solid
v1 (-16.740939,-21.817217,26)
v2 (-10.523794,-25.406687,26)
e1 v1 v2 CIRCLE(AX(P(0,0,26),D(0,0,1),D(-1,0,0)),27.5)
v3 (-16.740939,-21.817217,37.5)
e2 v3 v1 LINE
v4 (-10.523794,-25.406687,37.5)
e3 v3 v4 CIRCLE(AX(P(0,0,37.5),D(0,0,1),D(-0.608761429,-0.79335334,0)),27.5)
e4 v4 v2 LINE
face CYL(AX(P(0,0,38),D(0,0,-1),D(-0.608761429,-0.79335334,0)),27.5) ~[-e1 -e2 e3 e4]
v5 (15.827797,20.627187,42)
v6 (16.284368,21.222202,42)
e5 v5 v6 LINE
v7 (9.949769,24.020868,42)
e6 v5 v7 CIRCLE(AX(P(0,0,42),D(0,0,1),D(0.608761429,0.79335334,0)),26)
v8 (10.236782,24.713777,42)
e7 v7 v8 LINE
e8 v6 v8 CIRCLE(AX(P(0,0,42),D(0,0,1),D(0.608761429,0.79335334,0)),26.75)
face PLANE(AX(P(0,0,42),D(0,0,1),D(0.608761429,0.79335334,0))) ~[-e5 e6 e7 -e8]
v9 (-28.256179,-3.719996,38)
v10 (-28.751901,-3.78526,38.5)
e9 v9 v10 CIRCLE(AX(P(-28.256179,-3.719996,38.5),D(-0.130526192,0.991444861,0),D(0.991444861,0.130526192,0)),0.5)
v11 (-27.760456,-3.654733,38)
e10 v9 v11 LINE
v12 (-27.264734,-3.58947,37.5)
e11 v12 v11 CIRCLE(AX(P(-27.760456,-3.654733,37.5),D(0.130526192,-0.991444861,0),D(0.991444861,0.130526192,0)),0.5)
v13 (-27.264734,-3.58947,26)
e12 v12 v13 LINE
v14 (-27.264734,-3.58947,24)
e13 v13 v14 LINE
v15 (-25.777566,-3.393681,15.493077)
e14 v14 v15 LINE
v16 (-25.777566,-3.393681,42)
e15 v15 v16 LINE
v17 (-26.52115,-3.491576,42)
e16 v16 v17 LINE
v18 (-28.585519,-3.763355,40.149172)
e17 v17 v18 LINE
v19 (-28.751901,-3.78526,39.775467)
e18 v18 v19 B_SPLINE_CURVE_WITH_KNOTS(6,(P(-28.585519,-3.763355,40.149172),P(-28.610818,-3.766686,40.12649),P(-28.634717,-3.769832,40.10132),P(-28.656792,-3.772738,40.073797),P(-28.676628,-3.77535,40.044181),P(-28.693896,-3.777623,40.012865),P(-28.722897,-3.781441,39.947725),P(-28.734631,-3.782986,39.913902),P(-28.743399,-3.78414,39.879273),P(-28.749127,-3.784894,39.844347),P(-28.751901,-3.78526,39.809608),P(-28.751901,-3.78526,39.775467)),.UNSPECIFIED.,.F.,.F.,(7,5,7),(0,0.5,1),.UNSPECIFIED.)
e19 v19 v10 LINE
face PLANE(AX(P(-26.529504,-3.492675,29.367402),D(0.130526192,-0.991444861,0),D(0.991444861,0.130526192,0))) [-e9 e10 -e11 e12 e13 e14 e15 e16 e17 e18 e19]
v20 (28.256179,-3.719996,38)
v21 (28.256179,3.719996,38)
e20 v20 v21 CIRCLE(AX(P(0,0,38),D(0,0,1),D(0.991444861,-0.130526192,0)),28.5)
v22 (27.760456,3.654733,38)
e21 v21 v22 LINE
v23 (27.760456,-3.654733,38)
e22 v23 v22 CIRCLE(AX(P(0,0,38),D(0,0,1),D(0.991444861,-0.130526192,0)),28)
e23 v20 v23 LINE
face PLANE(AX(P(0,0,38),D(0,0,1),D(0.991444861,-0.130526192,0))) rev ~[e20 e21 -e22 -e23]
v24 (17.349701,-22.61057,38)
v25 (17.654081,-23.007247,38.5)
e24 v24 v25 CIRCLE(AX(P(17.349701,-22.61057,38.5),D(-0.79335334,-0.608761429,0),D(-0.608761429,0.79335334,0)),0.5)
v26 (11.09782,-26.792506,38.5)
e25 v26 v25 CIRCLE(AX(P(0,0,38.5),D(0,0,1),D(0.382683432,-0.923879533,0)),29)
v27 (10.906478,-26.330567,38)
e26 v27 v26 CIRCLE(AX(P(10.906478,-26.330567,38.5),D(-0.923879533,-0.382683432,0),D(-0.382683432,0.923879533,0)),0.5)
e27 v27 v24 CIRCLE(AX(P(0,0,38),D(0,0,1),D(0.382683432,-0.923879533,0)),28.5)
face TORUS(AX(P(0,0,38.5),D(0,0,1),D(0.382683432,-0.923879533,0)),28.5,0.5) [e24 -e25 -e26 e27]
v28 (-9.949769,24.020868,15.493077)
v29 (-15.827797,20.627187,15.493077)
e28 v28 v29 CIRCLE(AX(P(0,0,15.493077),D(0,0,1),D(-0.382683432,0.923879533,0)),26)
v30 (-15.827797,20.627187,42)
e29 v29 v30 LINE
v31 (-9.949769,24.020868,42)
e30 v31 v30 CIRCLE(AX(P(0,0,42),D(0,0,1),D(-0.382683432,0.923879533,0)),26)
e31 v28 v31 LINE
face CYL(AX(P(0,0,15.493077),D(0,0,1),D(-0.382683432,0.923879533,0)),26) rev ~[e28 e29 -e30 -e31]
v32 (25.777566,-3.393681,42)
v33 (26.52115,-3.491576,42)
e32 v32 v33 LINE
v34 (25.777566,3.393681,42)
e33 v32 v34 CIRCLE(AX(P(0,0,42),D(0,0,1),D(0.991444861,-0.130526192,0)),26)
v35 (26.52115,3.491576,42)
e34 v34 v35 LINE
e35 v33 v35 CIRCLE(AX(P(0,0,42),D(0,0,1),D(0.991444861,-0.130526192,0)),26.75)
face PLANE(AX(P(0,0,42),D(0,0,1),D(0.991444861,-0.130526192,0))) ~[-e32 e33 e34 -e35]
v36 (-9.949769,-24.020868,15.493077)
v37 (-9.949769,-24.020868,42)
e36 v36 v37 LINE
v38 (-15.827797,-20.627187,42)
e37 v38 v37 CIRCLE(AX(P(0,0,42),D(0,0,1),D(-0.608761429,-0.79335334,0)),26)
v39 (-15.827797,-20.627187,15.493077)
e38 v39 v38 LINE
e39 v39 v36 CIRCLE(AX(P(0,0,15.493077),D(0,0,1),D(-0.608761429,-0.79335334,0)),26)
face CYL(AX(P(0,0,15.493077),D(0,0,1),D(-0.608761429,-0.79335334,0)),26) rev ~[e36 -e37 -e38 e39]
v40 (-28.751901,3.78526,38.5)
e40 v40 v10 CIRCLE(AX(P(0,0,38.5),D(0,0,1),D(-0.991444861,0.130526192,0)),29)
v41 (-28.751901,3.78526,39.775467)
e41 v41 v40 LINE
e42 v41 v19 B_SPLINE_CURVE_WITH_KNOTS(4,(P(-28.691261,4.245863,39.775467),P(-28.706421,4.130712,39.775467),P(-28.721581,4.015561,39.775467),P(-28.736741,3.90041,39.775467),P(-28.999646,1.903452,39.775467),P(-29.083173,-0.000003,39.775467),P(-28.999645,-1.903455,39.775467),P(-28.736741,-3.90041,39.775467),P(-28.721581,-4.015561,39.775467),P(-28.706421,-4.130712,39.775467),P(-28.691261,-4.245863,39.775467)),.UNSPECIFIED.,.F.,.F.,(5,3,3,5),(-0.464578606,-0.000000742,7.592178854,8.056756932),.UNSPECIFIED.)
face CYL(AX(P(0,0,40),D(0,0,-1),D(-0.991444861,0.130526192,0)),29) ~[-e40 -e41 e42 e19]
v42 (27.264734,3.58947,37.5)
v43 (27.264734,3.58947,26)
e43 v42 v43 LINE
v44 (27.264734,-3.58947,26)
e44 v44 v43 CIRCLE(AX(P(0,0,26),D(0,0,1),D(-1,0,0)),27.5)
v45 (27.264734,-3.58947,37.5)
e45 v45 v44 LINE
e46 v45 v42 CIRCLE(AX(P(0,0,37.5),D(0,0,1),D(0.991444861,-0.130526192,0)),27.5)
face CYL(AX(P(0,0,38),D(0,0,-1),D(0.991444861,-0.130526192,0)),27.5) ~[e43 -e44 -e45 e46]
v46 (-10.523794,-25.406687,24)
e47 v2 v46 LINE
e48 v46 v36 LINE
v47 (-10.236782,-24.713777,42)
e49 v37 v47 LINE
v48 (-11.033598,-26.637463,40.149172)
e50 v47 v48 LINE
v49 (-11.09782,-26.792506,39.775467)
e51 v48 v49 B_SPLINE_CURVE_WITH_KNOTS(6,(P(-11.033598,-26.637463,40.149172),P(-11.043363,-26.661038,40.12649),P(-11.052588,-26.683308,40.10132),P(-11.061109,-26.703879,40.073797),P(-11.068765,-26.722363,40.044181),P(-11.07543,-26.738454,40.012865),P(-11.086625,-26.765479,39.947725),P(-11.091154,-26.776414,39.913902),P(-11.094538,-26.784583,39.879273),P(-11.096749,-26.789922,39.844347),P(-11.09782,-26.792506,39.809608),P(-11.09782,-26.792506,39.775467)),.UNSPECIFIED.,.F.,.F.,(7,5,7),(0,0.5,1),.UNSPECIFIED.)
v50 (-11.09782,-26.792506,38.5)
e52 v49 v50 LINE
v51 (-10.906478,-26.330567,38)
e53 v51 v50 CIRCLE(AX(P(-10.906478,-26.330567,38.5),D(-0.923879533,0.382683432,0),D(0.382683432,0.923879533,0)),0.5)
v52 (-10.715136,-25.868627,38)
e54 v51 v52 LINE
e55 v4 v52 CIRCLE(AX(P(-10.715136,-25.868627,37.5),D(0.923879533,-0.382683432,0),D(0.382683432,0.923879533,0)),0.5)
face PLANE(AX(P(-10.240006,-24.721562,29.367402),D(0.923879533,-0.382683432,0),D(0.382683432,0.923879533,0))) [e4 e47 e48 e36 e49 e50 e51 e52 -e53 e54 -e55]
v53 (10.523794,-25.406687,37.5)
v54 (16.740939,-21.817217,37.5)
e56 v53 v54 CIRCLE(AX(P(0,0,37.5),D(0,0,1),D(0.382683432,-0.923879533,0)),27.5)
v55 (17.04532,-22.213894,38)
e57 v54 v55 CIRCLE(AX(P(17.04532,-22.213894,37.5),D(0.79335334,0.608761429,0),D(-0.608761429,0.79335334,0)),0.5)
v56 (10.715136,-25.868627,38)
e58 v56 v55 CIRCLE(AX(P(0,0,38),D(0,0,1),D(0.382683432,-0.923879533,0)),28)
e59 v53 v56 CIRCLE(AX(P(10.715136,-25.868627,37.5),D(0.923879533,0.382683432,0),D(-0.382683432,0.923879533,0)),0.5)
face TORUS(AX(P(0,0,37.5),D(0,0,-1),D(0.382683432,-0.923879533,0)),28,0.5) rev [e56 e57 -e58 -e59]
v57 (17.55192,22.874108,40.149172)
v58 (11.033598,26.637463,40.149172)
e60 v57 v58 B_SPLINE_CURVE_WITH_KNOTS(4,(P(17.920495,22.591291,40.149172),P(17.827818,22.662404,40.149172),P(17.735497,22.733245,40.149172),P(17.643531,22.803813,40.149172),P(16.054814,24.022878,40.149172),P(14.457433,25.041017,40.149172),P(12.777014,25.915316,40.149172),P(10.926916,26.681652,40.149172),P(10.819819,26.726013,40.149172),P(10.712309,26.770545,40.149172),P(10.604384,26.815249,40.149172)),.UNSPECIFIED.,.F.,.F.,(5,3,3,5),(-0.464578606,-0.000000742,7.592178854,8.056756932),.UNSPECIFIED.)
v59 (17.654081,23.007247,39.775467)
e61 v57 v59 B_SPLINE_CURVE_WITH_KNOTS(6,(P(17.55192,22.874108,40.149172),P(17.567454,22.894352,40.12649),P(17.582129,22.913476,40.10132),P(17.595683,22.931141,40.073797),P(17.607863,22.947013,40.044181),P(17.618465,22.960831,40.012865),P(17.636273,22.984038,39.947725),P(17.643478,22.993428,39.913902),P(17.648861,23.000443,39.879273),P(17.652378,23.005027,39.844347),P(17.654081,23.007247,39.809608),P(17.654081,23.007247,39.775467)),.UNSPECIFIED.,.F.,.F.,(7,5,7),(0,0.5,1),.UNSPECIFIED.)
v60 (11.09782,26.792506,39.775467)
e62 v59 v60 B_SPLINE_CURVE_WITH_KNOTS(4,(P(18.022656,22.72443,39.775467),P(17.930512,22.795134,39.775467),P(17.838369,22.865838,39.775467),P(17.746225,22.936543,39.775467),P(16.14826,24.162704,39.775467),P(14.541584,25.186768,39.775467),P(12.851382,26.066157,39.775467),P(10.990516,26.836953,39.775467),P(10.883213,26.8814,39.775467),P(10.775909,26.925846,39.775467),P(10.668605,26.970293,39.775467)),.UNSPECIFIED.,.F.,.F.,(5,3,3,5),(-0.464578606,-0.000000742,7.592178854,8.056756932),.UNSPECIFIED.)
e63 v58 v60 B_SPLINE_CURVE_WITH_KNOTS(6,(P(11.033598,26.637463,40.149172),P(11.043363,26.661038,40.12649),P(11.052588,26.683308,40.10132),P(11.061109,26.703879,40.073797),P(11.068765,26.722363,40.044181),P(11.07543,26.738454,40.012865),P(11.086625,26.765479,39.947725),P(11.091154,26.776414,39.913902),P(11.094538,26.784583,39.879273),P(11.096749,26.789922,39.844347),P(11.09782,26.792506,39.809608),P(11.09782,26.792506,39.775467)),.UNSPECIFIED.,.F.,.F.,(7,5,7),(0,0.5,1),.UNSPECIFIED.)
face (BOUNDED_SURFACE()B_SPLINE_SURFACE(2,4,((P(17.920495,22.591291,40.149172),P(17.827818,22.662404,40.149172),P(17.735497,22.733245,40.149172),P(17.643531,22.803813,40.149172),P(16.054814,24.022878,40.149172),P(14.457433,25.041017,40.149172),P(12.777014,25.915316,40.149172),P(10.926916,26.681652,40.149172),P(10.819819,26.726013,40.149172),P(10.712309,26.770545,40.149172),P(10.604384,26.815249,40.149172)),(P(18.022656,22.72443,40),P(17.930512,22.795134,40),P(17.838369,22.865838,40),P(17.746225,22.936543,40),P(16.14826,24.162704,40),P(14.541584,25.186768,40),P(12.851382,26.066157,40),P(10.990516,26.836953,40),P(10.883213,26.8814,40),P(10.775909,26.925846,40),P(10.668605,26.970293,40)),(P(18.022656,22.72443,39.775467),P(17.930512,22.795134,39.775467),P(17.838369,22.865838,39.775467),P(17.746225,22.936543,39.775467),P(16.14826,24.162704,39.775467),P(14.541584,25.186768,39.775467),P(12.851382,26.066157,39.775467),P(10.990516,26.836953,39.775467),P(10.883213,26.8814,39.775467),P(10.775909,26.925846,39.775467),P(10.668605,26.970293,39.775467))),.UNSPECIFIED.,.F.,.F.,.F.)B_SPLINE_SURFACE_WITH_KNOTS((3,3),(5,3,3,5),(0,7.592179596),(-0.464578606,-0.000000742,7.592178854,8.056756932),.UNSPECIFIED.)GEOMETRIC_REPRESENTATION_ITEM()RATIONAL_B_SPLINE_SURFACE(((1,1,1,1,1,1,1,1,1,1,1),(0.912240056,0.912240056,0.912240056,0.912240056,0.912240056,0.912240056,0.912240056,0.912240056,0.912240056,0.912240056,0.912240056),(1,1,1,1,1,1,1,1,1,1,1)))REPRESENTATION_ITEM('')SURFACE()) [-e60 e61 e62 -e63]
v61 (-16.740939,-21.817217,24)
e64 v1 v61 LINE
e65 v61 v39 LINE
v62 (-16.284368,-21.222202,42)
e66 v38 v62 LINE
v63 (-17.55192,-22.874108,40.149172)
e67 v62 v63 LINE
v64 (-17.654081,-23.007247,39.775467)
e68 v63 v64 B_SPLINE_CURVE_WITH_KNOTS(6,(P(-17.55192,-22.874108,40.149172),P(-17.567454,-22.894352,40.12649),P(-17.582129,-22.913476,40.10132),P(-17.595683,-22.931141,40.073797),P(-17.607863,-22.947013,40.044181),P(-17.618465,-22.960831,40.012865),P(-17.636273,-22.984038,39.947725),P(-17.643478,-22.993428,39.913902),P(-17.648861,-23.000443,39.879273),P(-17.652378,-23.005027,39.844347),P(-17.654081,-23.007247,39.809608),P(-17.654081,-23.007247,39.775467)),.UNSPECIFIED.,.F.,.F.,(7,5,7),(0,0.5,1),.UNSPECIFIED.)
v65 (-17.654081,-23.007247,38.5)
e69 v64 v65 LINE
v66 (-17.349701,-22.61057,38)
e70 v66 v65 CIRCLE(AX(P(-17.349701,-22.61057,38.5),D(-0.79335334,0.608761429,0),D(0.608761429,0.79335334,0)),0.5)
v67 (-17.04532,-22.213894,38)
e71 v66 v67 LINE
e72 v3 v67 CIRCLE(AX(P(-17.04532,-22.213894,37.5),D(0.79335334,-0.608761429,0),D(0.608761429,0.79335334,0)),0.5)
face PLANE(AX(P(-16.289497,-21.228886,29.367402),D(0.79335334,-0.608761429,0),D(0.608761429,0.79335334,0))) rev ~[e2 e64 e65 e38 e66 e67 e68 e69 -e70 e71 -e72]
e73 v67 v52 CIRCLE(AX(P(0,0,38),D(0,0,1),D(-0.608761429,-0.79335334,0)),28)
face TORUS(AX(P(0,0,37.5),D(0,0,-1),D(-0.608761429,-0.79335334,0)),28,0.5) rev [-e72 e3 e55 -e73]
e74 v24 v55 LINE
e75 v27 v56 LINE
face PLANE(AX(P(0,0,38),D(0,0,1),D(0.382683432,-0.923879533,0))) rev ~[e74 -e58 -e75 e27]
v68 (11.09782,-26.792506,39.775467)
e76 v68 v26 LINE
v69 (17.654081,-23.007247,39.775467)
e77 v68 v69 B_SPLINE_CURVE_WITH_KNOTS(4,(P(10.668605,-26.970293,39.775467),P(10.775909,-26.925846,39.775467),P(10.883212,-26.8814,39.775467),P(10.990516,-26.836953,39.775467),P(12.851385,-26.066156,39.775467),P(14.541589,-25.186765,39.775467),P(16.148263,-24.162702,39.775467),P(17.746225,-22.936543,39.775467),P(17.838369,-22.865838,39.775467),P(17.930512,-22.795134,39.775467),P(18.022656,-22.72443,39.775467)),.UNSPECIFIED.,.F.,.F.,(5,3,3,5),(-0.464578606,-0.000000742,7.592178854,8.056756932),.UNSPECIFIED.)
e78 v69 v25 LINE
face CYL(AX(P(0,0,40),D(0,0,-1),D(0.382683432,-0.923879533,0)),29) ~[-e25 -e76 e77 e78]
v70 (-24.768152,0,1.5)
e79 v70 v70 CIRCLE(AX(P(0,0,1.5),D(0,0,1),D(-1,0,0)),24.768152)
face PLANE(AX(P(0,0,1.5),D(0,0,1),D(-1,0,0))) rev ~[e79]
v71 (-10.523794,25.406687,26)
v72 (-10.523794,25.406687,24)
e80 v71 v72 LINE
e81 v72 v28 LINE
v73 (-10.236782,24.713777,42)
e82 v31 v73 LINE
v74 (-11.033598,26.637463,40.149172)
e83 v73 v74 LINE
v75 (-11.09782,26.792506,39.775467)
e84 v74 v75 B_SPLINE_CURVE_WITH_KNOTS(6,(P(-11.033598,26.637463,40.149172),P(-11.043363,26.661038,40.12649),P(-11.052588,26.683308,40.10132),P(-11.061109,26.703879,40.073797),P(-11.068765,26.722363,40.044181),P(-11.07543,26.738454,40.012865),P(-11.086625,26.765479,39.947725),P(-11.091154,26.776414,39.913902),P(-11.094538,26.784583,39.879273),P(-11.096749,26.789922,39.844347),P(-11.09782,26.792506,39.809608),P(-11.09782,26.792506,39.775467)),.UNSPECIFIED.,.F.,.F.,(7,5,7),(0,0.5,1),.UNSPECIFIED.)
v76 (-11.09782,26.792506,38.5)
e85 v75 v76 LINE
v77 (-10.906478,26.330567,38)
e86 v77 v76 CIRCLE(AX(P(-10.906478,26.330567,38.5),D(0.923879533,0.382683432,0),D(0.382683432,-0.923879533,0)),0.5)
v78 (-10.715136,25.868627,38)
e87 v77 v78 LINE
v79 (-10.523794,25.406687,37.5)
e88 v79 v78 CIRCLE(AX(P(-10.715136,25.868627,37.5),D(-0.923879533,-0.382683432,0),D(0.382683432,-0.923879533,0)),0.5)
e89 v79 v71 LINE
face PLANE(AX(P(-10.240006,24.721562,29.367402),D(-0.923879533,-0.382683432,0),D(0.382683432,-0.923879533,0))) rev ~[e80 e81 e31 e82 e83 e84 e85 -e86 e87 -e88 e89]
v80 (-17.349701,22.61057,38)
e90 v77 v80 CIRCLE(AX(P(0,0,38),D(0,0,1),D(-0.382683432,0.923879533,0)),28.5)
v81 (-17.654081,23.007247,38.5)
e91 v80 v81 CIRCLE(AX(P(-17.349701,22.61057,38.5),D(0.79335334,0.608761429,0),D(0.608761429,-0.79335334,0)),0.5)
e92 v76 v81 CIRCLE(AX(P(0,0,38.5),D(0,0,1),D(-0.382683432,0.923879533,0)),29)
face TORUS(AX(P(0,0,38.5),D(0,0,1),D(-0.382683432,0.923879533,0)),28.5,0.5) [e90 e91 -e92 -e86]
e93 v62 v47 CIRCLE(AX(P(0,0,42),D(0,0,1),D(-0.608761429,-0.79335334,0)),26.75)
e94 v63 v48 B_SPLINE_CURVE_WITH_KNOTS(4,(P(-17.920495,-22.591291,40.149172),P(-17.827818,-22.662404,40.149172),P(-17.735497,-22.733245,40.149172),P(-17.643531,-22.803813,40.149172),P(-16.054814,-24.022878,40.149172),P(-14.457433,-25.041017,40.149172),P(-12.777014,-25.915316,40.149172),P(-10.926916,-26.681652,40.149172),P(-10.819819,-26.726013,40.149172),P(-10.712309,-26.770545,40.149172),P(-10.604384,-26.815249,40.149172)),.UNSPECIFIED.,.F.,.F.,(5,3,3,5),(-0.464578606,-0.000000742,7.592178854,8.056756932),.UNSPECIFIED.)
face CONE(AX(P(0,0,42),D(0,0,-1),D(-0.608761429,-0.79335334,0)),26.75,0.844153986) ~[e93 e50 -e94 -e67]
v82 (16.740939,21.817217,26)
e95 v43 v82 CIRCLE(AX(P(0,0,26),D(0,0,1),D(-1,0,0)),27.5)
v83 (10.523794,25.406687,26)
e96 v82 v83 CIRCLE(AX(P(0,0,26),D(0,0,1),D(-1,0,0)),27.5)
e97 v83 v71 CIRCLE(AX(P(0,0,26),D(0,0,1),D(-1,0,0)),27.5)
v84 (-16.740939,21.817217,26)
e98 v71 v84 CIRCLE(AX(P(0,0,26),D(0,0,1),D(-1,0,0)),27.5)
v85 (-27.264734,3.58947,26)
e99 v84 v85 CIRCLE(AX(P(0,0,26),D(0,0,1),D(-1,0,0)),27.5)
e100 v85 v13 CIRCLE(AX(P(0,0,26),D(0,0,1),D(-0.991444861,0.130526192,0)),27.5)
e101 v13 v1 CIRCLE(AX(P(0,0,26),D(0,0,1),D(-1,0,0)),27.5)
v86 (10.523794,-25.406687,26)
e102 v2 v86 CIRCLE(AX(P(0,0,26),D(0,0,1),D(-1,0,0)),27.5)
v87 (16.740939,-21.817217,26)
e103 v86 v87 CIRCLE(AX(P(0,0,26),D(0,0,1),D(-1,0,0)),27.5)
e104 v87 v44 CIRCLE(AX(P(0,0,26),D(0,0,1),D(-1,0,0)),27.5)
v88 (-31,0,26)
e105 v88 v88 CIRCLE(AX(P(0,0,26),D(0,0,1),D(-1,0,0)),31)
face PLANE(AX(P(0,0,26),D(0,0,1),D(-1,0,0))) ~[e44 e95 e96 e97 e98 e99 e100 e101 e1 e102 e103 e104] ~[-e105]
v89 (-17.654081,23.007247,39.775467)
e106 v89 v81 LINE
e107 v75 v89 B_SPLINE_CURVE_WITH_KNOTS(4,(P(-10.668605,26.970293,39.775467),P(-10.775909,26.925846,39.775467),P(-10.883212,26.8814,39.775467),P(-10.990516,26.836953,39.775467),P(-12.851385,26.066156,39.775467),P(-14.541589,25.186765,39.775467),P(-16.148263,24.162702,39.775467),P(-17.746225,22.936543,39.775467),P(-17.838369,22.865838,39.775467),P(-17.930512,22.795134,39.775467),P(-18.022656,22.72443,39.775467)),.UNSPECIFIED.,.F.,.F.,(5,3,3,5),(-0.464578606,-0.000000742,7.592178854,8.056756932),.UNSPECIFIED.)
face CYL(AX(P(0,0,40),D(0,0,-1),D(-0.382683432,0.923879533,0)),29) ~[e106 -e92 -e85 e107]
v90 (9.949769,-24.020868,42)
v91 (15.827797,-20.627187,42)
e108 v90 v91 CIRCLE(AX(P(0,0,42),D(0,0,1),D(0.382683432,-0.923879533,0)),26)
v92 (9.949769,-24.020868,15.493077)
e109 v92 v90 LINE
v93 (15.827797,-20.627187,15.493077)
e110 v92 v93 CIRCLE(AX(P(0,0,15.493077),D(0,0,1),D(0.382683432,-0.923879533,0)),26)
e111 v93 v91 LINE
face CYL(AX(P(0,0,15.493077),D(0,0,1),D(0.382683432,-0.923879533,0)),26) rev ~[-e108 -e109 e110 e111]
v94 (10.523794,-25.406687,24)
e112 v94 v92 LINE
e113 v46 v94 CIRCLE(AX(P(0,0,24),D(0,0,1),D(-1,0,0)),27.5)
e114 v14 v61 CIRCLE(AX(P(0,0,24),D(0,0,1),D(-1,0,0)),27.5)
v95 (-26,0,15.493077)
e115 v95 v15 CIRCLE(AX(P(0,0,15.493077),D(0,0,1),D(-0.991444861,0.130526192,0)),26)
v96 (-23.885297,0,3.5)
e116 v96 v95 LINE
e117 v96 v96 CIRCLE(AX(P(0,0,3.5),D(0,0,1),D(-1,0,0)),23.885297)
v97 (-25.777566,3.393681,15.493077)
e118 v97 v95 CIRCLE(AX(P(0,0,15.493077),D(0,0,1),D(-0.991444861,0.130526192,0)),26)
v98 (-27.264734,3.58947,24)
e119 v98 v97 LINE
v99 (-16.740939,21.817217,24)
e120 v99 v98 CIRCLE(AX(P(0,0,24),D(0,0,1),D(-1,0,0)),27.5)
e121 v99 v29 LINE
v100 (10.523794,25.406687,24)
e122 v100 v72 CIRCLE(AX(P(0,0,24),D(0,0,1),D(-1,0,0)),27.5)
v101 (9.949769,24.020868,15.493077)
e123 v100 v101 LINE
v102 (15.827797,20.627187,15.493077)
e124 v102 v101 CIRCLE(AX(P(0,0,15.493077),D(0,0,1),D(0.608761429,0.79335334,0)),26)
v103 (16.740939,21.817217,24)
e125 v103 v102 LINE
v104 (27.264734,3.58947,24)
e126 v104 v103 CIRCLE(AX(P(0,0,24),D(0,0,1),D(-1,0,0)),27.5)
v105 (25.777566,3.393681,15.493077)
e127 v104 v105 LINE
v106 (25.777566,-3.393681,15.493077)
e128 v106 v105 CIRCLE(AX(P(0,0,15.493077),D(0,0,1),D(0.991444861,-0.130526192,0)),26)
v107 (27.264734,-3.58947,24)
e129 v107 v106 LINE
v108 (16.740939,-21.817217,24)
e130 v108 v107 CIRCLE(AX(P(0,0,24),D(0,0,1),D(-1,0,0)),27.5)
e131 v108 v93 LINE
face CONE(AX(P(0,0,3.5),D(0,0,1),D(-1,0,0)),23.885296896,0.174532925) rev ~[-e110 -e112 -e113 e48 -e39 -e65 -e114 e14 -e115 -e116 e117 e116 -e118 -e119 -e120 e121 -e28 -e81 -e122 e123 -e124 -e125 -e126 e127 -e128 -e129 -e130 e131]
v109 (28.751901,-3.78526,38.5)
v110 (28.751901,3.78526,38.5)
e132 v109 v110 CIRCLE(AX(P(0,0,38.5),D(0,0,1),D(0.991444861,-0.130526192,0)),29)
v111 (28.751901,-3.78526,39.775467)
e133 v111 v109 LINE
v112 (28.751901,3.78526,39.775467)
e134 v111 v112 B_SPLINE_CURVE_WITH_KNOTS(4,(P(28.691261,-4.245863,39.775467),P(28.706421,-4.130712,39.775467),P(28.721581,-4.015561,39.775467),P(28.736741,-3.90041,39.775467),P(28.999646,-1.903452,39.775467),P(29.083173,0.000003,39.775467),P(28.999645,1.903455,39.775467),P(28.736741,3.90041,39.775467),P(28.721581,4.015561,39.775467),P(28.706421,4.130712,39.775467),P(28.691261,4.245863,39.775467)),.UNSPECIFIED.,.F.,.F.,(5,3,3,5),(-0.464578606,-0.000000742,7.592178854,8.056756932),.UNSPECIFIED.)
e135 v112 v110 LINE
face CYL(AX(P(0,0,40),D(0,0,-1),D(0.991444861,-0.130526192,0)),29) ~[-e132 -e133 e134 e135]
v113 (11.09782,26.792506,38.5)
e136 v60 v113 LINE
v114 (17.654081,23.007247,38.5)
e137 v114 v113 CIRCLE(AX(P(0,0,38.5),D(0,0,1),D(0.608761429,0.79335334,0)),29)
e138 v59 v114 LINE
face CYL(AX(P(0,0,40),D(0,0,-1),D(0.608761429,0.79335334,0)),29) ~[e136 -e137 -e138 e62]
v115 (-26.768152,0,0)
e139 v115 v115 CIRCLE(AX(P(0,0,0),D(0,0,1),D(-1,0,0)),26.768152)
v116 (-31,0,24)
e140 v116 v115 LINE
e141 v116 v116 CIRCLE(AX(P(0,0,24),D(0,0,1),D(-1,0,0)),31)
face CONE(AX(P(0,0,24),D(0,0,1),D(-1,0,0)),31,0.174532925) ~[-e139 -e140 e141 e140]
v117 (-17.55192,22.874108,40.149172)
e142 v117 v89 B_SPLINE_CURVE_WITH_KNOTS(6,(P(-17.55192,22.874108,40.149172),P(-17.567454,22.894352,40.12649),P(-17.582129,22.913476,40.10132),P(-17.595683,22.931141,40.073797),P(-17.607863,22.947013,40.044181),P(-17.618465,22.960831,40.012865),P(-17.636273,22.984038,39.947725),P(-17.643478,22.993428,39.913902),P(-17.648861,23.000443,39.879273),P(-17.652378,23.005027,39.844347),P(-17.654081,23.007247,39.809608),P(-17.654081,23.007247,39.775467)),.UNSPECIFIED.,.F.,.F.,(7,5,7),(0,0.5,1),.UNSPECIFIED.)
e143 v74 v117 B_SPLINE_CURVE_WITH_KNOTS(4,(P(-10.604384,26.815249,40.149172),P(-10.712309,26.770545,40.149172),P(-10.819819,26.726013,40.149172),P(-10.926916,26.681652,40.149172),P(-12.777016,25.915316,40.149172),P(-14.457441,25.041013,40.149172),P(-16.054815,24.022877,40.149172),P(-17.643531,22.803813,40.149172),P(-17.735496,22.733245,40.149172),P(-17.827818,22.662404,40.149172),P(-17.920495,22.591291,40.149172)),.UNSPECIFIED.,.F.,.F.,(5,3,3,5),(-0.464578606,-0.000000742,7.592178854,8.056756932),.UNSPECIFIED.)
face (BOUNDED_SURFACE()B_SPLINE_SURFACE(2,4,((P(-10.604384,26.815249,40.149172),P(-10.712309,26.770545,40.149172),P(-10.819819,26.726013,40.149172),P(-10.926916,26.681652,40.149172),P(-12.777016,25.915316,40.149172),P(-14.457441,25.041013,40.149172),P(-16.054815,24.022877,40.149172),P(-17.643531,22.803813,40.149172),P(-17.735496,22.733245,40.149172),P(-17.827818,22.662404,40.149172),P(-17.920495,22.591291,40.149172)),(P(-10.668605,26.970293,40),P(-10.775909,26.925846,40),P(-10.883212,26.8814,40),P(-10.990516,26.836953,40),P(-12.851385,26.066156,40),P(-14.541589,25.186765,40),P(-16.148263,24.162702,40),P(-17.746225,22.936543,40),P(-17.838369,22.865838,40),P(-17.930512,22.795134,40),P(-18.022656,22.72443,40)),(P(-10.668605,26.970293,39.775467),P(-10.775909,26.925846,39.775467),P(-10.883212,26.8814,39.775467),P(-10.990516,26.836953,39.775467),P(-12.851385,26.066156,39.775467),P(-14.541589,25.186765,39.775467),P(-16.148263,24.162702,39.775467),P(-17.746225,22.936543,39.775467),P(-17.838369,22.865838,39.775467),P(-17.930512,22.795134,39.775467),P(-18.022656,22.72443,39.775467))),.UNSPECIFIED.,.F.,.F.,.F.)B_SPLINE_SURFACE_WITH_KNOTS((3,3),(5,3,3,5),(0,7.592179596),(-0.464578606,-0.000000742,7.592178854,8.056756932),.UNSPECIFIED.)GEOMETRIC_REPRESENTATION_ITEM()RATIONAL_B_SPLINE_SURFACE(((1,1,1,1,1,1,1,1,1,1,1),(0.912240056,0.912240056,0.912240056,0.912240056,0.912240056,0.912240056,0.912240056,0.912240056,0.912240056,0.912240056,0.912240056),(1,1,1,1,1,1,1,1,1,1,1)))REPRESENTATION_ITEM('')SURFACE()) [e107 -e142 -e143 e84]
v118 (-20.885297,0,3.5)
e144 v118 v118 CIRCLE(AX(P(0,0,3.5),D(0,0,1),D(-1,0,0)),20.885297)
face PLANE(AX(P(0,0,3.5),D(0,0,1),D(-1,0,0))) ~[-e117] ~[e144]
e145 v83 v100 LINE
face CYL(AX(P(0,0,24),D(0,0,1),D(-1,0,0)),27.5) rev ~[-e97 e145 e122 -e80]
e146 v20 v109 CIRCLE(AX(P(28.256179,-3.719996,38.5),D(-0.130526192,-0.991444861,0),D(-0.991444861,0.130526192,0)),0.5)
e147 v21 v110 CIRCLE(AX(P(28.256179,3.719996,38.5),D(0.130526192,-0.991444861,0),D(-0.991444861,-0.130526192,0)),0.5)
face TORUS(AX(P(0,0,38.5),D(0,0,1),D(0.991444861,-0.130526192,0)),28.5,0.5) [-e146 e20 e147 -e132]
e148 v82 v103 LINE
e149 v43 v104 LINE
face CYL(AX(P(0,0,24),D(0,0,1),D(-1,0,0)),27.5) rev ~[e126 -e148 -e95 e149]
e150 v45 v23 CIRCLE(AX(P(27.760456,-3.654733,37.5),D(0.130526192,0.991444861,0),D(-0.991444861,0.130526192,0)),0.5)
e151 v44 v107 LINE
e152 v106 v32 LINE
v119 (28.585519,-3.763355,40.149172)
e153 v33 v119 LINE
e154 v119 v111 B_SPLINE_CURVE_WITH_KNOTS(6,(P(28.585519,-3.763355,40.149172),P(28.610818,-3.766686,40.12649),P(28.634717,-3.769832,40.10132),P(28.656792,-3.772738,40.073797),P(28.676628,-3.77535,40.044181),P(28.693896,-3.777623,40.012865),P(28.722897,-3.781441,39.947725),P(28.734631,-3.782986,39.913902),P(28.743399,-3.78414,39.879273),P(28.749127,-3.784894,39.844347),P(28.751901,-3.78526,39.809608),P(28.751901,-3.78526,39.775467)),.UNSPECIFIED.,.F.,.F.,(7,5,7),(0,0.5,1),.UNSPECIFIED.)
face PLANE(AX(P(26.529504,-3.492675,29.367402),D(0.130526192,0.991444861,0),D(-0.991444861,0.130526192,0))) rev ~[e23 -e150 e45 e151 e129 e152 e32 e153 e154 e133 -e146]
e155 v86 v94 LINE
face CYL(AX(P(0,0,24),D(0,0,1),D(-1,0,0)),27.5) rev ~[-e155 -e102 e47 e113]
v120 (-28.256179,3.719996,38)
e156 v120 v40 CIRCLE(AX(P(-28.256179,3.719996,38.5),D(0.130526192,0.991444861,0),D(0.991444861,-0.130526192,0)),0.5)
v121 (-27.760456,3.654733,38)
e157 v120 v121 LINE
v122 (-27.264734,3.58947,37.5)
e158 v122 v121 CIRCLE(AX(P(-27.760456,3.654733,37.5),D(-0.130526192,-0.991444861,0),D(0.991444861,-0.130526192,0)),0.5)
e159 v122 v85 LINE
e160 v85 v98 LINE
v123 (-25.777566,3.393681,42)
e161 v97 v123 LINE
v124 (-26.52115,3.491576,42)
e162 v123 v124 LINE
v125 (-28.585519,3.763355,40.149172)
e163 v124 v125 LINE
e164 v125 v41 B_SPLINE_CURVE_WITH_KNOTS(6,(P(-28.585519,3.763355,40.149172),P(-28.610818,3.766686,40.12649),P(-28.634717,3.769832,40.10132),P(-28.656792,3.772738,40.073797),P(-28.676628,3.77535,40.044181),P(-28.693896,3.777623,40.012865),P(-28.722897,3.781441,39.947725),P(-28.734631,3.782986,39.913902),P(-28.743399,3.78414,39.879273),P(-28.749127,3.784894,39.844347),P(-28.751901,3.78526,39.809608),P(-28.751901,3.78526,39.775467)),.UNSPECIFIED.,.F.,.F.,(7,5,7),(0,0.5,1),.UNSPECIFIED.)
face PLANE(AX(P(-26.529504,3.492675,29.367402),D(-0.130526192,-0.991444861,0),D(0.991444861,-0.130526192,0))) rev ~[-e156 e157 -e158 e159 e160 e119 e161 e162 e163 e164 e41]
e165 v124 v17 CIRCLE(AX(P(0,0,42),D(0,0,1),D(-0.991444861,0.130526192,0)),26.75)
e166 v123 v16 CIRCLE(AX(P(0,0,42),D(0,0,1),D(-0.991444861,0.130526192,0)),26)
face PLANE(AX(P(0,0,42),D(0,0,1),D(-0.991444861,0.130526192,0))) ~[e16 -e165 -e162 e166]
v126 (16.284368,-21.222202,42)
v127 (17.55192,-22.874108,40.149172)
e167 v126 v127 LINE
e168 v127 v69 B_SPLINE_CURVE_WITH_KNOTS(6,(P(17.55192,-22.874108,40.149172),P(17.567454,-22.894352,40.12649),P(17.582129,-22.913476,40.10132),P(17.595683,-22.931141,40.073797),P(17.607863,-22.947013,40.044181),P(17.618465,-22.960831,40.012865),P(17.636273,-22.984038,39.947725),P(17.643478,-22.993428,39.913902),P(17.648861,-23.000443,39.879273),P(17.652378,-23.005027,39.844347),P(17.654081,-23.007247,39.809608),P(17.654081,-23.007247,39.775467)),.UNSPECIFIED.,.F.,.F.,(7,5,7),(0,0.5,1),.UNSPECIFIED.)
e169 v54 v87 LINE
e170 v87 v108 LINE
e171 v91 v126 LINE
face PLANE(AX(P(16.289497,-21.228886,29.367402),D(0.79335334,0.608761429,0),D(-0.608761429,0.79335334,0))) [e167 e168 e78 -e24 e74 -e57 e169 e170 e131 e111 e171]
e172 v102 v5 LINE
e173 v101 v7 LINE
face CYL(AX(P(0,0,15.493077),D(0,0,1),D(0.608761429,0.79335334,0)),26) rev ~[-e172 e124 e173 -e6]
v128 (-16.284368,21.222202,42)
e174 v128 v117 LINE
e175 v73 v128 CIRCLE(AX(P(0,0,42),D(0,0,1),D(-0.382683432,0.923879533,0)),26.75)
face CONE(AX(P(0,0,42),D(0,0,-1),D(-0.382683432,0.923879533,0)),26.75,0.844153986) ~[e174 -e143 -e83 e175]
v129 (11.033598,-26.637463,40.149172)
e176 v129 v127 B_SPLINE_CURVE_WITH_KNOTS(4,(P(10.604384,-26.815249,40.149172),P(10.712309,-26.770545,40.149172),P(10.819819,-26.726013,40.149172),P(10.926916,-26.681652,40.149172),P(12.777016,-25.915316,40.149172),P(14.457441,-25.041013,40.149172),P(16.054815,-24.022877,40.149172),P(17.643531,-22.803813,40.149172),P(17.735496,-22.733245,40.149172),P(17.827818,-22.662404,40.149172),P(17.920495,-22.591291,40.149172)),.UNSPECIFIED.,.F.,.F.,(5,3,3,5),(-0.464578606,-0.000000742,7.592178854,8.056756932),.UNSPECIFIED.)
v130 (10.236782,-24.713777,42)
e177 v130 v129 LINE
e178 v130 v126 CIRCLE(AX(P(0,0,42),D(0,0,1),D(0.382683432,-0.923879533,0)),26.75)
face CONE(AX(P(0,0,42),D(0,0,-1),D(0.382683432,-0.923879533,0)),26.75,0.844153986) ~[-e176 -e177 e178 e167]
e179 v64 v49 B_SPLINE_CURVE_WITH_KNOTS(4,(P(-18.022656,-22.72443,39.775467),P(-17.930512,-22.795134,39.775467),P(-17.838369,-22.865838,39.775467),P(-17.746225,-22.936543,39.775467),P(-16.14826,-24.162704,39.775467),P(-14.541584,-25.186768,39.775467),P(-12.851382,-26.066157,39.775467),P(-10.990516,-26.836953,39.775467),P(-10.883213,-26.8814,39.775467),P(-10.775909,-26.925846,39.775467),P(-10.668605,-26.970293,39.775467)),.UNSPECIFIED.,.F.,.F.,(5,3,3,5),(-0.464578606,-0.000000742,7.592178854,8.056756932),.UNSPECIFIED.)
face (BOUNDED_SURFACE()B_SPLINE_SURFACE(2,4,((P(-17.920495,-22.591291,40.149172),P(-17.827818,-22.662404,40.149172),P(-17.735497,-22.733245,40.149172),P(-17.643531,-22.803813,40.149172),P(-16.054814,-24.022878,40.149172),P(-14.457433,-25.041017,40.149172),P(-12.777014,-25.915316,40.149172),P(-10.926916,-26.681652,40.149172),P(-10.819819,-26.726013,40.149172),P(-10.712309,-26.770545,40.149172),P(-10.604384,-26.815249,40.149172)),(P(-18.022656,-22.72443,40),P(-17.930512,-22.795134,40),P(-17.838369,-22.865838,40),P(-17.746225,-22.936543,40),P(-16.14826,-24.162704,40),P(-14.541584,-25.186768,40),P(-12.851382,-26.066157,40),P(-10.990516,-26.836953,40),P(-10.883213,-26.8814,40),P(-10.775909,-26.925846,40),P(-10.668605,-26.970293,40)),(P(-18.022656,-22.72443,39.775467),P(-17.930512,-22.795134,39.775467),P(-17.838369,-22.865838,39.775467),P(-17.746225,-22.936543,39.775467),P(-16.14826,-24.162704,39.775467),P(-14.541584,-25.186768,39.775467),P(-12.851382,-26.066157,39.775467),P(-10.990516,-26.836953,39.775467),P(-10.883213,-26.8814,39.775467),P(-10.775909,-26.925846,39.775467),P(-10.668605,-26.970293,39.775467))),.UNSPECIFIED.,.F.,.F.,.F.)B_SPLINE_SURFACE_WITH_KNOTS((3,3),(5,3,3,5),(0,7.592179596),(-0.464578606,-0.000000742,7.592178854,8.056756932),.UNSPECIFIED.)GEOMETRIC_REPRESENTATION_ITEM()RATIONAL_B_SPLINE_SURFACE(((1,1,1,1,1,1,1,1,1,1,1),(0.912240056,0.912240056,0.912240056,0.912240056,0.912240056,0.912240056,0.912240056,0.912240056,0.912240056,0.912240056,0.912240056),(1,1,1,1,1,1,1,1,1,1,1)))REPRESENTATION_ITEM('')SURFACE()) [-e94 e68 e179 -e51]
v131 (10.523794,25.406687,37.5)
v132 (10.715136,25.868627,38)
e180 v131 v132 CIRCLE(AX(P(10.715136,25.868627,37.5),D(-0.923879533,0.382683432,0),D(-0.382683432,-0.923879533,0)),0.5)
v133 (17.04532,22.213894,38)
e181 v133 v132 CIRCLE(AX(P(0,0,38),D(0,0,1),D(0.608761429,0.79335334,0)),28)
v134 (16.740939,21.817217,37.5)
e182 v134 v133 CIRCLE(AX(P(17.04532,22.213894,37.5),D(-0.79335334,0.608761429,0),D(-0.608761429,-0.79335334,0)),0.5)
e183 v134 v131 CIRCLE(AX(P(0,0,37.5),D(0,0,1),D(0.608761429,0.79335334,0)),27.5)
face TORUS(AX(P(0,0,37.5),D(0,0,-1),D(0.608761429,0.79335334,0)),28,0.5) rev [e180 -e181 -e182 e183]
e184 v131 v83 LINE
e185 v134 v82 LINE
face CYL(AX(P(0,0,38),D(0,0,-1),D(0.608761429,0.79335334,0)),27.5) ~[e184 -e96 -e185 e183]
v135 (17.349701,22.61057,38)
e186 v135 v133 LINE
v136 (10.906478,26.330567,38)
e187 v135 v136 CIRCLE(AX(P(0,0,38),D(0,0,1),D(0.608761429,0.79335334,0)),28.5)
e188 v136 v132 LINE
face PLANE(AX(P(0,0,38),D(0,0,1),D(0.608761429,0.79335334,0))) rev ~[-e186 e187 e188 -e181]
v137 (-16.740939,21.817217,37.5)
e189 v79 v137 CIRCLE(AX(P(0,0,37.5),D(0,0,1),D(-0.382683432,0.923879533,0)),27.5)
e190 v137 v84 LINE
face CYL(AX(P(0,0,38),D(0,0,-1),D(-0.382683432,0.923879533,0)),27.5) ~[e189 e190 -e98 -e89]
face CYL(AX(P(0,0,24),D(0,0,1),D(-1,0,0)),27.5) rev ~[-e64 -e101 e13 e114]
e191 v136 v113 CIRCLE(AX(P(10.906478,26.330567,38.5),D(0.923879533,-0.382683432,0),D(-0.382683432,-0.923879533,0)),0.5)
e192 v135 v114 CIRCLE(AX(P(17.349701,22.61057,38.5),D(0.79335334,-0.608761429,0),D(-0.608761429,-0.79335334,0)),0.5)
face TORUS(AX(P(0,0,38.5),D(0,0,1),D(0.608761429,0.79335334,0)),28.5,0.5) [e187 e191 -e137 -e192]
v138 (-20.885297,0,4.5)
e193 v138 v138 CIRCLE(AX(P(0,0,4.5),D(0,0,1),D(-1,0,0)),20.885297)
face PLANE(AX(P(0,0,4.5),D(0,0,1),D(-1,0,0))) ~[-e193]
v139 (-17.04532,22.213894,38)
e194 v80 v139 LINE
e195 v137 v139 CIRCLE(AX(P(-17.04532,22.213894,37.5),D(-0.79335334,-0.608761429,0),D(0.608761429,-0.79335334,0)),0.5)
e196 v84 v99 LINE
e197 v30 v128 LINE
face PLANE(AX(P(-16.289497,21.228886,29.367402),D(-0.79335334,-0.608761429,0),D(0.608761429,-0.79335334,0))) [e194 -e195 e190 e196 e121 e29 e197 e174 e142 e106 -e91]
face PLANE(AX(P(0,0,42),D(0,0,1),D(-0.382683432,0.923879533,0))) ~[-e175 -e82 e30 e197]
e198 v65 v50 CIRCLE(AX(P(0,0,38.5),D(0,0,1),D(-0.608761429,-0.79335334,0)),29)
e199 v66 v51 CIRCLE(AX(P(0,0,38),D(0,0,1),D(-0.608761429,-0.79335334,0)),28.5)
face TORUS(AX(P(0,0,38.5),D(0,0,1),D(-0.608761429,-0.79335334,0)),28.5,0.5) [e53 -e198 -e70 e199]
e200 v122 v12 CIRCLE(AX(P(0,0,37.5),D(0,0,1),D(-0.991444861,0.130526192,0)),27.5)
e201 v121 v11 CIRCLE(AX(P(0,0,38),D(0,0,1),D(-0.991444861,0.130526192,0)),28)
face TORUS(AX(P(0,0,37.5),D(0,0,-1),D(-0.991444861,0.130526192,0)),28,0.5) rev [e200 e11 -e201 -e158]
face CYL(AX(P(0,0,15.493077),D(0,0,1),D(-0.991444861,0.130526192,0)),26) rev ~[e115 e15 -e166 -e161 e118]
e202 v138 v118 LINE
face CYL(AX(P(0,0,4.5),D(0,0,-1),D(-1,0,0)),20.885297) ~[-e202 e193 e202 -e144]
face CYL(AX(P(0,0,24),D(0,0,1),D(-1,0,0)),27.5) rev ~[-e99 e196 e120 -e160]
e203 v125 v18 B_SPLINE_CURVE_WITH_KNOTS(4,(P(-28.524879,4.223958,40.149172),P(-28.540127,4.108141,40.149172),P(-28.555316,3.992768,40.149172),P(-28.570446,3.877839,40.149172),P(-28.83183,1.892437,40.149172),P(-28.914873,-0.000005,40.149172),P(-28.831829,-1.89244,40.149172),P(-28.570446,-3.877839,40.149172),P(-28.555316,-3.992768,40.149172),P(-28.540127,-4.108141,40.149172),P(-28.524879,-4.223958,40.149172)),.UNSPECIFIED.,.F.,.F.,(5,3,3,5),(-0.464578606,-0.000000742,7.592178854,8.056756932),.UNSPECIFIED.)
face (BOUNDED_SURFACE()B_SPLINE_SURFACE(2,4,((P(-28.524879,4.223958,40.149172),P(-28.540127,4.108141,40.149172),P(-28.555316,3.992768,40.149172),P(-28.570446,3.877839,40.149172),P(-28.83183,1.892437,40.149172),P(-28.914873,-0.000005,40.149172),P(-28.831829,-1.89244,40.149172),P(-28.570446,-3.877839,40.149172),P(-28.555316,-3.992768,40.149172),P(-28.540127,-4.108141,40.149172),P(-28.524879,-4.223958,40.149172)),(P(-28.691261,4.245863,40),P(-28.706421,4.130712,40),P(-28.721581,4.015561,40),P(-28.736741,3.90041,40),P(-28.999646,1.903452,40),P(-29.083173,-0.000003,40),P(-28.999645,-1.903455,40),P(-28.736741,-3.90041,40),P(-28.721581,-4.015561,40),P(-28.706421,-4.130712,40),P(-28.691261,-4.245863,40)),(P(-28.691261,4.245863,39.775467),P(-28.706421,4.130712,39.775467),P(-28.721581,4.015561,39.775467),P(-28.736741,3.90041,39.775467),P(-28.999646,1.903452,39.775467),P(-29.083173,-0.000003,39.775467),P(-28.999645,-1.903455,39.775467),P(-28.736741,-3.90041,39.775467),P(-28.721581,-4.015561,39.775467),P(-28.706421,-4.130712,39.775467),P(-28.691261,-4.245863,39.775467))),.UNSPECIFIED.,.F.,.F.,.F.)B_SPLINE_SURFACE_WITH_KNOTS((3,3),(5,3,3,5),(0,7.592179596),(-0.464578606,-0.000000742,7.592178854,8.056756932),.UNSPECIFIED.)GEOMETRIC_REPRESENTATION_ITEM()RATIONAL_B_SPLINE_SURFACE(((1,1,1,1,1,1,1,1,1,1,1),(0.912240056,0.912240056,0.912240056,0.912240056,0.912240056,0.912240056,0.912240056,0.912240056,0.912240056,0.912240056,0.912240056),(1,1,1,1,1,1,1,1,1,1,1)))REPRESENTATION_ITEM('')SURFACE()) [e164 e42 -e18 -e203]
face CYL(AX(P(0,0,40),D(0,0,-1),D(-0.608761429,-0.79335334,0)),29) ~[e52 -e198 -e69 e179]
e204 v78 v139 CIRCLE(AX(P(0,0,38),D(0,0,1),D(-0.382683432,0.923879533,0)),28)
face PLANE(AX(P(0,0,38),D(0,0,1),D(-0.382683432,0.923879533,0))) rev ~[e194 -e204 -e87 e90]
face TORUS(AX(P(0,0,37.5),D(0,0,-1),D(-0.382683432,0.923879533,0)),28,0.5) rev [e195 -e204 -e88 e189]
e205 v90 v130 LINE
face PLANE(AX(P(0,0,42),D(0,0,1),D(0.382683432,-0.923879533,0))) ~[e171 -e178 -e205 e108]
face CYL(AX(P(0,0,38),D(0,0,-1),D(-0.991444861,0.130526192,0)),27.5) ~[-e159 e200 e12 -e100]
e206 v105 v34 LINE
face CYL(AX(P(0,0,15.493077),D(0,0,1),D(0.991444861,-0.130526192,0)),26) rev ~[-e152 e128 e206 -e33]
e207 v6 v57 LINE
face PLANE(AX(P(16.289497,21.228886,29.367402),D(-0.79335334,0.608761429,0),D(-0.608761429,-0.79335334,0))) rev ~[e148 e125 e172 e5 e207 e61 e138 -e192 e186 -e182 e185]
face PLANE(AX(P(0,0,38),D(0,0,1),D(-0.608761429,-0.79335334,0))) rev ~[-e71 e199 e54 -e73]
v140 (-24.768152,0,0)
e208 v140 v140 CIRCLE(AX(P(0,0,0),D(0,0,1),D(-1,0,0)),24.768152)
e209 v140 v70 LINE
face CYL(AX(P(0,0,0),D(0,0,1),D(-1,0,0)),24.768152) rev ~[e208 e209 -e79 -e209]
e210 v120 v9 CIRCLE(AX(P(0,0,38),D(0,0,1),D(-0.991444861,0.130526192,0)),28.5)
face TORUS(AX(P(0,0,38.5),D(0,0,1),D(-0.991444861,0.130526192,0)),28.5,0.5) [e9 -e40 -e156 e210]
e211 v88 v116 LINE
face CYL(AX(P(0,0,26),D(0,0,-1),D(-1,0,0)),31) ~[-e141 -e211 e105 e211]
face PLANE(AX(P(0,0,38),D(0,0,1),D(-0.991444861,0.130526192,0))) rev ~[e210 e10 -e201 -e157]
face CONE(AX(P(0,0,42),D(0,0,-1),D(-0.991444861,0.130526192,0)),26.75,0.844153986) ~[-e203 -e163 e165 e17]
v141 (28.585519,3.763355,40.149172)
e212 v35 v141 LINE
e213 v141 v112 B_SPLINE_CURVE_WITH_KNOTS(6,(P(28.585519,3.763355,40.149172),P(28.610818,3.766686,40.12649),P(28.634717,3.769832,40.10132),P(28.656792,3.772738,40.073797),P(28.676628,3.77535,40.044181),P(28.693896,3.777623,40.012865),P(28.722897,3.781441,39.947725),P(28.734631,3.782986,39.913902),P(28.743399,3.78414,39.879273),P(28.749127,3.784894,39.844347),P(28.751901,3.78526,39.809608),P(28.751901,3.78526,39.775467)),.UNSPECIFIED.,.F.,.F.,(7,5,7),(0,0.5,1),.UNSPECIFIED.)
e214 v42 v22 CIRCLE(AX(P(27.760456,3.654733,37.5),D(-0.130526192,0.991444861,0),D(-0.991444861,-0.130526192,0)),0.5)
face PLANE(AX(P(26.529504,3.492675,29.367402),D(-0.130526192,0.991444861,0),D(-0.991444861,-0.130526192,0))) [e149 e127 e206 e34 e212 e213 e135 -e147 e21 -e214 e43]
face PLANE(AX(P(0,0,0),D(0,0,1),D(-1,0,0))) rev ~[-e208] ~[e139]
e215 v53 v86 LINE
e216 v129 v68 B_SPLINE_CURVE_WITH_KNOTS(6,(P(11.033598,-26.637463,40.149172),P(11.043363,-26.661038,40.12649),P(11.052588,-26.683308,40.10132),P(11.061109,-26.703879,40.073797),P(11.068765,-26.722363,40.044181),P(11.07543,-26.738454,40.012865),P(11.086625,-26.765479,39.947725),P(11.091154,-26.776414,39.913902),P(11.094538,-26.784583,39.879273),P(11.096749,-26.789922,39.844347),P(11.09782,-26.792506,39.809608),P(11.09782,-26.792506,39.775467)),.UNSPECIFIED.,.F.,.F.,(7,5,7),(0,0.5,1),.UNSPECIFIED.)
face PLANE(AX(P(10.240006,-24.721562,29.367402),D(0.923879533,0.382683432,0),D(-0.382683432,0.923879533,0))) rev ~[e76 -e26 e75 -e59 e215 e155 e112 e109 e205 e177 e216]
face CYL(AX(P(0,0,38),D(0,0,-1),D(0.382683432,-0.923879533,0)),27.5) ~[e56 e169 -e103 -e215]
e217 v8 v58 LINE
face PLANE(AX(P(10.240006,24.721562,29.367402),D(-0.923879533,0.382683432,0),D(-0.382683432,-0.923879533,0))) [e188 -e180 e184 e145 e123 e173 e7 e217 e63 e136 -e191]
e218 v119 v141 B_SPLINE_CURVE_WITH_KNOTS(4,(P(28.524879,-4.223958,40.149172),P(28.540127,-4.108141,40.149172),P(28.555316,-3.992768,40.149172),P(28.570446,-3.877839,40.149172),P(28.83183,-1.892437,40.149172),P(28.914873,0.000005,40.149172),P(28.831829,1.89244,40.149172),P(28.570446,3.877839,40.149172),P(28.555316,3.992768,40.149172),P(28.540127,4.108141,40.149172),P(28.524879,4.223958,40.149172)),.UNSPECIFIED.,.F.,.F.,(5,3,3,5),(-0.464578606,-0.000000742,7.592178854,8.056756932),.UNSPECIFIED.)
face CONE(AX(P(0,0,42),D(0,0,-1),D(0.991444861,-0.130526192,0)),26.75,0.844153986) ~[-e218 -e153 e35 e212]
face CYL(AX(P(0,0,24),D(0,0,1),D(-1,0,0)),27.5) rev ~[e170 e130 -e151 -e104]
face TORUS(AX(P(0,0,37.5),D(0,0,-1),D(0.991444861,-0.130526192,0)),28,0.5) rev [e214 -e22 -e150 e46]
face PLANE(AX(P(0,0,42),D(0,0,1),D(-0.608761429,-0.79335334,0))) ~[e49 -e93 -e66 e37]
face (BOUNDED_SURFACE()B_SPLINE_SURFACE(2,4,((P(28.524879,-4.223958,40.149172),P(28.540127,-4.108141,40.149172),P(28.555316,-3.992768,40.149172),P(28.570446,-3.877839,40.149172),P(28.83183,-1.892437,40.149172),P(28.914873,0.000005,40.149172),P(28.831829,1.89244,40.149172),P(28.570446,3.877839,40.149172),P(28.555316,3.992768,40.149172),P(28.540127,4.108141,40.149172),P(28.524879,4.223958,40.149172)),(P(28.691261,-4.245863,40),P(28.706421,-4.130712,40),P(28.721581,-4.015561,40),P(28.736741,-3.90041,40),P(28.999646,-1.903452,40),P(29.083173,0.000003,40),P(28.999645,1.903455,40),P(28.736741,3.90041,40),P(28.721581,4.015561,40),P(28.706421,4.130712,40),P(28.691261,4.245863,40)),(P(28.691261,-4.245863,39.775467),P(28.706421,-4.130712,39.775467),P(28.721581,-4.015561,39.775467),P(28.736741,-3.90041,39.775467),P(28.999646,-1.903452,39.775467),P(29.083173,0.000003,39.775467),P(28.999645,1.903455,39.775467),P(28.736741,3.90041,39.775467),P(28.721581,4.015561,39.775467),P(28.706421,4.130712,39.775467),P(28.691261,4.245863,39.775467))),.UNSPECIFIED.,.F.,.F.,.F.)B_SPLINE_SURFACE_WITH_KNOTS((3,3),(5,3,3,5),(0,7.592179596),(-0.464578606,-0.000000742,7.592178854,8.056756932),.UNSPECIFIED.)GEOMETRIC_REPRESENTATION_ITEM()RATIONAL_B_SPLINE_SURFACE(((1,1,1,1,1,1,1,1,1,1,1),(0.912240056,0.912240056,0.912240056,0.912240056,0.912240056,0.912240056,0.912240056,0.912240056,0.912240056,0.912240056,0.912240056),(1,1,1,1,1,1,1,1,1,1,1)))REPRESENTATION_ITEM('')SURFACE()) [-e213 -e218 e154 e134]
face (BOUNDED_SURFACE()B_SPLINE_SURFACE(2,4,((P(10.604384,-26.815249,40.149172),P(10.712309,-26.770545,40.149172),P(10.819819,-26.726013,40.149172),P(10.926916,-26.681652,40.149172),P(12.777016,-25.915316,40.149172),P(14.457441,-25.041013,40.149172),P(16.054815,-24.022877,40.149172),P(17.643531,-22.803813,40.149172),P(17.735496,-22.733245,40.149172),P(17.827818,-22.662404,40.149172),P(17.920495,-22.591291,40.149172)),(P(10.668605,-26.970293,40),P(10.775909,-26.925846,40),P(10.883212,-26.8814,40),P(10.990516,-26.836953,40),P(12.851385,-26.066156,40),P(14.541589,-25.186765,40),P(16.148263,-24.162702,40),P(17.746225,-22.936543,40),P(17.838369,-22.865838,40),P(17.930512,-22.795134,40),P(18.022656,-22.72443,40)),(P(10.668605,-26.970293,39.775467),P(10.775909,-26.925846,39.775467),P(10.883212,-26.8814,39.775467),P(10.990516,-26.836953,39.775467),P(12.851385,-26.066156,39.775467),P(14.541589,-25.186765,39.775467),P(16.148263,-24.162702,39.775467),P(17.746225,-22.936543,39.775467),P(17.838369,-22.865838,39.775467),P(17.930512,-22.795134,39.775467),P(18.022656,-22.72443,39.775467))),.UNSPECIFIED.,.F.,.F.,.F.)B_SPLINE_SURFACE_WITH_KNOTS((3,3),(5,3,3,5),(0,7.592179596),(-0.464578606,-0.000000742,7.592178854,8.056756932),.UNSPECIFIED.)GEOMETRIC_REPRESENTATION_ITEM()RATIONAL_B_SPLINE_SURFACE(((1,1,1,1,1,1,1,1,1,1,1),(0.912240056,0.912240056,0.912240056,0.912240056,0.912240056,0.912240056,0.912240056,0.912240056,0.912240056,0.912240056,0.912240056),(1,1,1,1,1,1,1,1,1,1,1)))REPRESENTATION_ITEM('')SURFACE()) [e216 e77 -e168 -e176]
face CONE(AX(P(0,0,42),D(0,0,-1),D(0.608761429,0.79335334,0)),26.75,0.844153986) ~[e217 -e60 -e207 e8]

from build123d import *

# Parameters (mm, degrees)
F3_ANGLE_BACK   = 7.5
F3_ANGLE        = 15
F3_COPIES_COUNT = 6
F4_R            = 0.5


# Not quite as in the source:
# - a pattern or mirror of a feature is missing from the dataset's text; its kind, count and spacing are read off the source's solid


with BuildPart() as f1:
    # F0 (on Front) → F1 (revolve)
    with BuildSketch(Plane.XZ):
        Polygon((-24.768152463, 1.5), (0, 1.5), (0, 4.5), (-20.8852968955, 4.5), (-20.8852968955, 3.5), (-23.8852968955, 3.5), (-27.5, 24), (-27.5, 26), (-31, 26), (-31, 24), (-26.768152463, 0), (-24.768152463, 0), align=None)
    revolve(axis=Axis((0, 0, 25), (0, 0, 1)))

    # F2 (on Front) → F3 (revolve)
    with BuildSketch(Plane.XZ, mode=Mode.PRIVATE) as f3_sk:
        Polygon((-27.5, 38), (-27.5, 24), (-26, 15.4930772706), (-26, 42), (-26.75, 42), (-29, 40), (-29, 38), align=None)
    f3 = revolve(f3_sk.sketch.rotate(Axis((0, 0, 25), (0, 0, 1)), -F3_ANGLE_BACK), axis=Axis((0, 0, 25), (0, 0, 1)), revolution_arc=F3_ANGLE)

    # F3_copies: F3 ×6 about axis
    f3_copies_axis = Axis((0, 0, 0), (0, 0, 1))
    for i in range(1, F3_COPIES_COUNT):
        add(f3.rotate(f3_copies_axis, i * 360 / F3_COPIES_COUNT))

    # F4
    f4_edges = [f1.edges().sort_by_distance(p)[0] for p in [
        (-29, 0, 38),
        (-29, 0, 40),
        (-27.5, 0, 38),
        (-13.75, -23.815699, 38),
        (13.75, -23.815699, 38),
        (27.5, 0, 38),
        (13.75, 23.815699, 38),
        (-13.75, 23.815699, 38),
        (-14.5, -25.114737, 38),
        (14.5, -25.114737, 38),
        (29, 0, 38),
        (14.5, 25.114737, 38),
        (-14.5, 25.114737, 38),
        (-14.5, -25.114737, 40),
        (14.5, -25.114737, 40),
        (29, 0, 40),
        (14.5, 25.114737, 40),
        (-14.5, 25.114737, 40),
    ]]
    fillet(f4_edges, radius=F4_R)


solid = f1.part
